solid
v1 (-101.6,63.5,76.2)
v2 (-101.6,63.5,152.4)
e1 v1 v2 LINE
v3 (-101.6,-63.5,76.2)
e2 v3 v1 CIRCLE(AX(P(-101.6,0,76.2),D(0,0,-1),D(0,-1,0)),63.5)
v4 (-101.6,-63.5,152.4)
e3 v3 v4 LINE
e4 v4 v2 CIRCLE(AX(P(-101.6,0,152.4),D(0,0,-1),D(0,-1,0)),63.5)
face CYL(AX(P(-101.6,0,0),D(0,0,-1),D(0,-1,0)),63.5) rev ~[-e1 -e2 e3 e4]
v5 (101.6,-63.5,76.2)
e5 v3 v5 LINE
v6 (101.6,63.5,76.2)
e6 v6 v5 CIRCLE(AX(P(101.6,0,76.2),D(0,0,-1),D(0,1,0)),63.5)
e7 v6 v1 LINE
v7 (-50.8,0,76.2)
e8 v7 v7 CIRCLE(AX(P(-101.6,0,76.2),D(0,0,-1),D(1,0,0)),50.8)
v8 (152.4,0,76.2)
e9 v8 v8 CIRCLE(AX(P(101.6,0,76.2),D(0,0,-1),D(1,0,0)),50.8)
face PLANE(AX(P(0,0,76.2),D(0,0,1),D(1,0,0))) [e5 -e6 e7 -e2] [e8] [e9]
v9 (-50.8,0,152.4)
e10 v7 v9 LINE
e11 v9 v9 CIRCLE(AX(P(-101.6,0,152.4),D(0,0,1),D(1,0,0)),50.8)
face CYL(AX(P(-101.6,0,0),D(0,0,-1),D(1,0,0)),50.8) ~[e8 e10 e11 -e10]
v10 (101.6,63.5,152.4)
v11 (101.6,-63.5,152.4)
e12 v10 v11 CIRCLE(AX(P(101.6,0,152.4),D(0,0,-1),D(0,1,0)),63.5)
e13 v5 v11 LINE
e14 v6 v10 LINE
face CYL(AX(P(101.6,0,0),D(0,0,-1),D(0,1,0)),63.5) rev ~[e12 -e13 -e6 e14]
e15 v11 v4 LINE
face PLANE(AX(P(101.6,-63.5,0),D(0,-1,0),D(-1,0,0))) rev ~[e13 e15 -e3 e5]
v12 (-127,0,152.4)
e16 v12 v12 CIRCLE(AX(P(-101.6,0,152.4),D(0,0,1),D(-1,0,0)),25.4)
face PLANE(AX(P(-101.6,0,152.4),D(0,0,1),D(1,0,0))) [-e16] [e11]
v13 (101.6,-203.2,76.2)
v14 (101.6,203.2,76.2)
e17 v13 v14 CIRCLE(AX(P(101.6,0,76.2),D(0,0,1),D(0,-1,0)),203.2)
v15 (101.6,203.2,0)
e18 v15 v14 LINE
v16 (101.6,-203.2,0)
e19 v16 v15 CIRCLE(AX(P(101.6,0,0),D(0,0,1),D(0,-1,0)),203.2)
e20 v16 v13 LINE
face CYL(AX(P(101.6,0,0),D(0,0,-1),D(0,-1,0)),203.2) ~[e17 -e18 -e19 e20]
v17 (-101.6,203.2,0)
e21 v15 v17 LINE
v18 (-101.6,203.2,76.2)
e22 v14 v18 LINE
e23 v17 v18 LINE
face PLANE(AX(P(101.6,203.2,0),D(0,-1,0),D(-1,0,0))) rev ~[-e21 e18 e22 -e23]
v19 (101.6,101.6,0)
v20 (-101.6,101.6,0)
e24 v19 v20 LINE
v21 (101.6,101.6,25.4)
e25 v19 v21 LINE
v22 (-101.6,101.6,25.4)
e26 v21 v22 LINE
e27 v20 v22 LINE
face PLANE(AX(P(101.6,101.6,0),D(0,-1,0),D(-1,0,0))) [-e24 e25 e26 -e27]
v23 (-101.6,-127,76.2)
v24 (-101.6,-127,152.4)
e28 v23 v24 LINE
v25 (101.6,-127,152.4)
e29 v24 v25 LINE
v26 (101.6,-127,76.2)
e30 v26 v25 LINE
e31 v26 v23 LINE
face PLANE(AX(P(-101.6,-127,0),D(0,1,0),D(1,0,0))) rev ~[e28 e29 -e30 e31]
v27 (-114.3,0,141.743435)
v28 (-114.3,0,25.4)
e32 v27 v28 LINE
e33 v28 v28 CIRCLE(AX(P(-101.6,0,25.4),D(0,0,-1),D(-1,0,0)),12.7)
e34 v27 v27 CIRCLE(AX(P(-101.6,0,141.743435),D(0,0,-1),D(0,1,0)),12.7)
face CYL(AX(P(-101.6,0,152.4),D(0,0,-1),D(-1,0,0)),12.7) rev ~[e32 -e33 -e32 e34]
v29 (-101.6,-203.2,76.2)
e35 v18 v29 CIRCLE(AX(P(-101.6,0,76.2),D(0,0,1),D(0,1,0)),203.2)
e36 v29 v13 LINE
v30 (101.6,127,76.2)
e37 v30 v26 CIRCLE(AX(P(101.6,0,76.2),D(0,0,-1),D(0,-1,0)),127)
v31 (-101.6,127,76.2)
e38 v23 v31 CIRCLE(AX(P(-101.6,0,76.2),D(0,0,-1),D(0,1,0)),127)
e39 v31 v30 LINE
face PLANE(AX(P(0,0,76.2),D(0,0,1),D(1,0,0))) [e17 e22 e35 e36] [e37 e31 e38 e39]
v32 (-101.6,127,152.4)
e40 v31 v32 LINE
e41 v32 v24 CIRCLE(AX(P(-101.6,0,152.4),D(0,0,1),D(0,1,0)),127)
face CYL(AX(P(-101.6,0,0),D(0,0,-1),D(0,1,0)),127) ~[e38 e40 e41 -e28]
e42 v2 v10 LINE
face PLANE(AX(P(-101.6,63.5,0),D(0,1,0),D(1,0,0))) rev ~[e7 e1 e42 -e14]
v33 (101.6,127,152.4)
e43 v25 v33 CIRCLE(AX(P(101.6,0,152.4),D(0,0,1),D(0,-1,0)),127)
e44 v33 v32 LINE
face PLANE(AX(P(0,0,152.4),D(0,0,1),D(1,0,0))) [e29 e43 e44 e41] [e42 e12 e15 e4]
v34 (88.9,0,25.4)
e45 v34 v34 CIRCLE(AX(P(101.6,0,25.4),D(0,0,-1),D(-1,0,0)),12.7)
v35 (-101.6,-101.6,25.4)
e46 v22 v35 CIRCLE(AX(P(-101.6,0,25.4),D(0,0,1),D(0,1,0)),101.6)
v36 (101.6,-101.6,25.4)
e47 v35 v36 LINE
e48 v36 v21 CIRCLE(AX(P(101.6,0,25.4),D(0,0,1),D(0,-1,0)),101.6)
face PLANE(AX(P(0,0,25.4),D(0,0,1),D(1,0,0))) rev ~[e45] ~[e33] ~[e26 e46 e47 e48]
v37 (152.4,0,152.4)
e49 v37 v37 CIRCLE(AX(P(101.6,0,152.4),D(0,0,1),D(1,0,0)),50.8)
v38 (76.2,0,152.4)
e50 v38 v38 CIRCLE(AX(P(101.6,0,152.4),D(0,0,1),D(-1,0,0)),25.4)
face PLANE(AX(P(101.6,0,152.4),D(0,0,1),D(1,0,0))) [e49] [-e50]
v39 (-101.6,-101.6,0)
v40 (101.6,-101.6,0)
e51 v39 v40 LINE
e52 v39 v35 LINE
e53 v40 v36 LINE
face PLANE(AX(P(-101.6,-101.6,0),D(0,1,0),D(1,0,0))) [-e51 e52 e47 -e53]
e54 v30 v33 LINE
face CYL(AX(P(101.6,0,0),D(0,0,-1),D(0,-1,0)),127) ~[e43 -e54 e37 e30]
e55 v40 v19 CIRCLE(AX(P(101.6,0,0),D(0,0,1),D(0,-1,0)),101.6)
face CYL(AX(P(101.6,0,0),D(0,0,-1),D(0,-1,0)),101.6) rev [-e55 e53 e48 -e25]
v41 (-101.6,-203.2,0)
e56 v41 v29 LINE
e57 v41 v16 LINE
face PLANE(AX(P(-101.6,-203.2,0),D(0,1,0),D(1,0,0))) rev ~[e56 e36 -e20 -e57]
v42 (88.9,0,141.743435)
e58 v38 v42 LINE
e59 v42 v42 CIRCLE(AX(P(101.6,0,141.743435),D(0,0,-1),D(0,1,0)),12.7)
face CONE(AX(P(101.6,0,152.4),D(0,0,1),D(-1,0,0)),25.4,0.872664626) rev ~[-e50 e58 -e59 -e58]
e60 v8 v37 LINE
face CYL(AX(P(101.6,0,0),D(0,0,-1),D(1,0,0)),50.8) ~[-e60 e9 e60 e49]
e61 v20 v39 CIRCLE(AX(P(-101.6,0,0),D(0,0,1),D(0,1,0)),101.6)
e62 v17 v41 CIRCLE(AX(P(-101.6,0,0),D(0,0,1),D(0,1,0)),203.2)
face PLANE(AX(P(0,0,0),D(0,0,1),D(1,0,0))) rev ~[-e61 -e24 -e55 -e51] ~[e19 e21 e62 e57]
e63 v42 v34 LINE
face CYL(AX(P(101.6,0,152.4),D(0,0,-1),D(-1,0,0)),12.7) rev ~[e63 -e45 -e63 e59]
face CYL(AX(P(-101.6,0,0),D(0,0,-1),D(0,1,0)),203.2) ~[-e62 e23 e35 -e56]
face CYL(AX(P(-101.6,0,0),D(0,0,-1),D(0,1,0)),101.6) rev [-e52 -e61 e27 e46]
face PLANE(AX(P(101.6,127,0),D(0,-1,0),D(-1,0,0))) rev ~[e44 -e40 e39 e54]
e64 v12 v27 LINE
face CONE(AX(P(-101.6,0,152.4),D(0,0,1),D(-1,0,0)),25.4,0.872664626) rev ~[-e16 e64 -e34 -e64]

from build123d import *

# Parameters (mm, degrees)
F0_R           = 50.8
F0_R_2         = 25.4
F1_DEPTH       = 76.2
F2_DEPTH       = 152.4
F4_DEPTH       = 25.4
F6_D           = 25.4
F6_CSINK_D     = 50.8
F6_CSINK_ANGLE = 100


# Not quite as in the source:
# - a feature names something its author has since deleted; it is built from what else it names


with BuildPart() as f1:
    # F0 (on Top) → F1 (new body)
    with BuildSketch(Plane.XY):
        with BuildLine():
            Line((101.6, 203.2), (-101.6, 203.2))
            ThreePointArc((-101.6, 203.2), (-304.8, 0), (-101.6, -203.2))
            Line((-101.6, -203.2), (101.6, -203.2))
            ThreePointArc((101.6, -203.2), (304.8, 0), (101.6, 203.2))
        make_face()
        with BuildLine():
            ThreePointArc((-101.6, -127), (-228.6, 0), (-101.6, 127))
            Line((-101.6, 127), (101.6, 127))
            ThreePointArc((101.6, 127), (228.6, 0), (101.6, -127))
            Line((101.6, -127), (-101.6, -127))
        make_face(mode=Mode.SUBTRACT)
        with BuildLine():
            Line((101.6, 127), (-101.6, 127))
            ThreePointArc((-101.6, 127), (-228.6, 0), (-101.6, -127))
            Line((-101.6, -127), (101.6, -127))
            ThreePointArc((101.6, -127), (228.6, 0), (101.6, 127))
        make_face()
        with BuildLine():
            ThreePointArc((101.6, 63.5), (165.1, 0), (101.6, -63.5))
            Line((101.6, -63.5), (-101.6, -63.5))
            ThreePointArc((-101.6, -63.5), (-165.1, 0), (-101.6, 63.5))
            Line((-101.6, 63.5), (101.6, 63.5))
        make_face(mode=Mode.SUBTRACT)
        with BuildLine():
            Line((-101.6, -63.5), (101.6, -63.5))
            ThreePointArc((101.6, -63.5), (165.1, 0), (101.6, 63.5))
            Line((101.6, 63.5), (-101.6, 63.5))
            ThreePointArc((-101.6, 63.5), (-165.1, 0), (-101.6, -63.5))
        make_face()
        with Locations((-101.6, 0)):
            Circle(F0_R, mode=Mode.SUBTRACT)
        with Locations((101.6, 0)):
            Circle(F0_R, mode=Mode.SUBTRACT)
        with Locations((-101.6, 0)):
            Circle(F0_R)
        with Locations((-101.6, 0)):
            Circle(F0_R_2, mode=Mode.SUBTRACT)
        with Locations((101.6, 0)):
            Circle(F0_R)
        with Locations((101.6, 0)):
            Circle(F0_R_2, mode=Mode.SUBTRACT)
        with Locations((-101.6, 0)):
            Circle(F0_R_2)
        with Locations((101.6, 0)):
            Circle(F0_R_2)
    extrude(amount=F1_DEPTH)

    # F0 (on Top) → F2 (join)
    with BuildSketch(Plane.XY):
        with BuildLine():
            Line((101.6, 127), (-101.6, 127))
            ThreePointArc((-101.6, 127), (-228.6, 0), (-101.6, -127))
            Line((-101.6, -127), (101.6, -127))
            ThreePointArc((101.6, -127), (228.6, 0), (101.6, 127))
        make_face()
        with BuildLine():
            ThreePointArc((101.6, 63.5), (165.1, 0), (101.6, -63.5))
            Line((101.6, -63.5), (-101.6, -63.5))
            ThreePointArc((-101.6, -63.5), (-165.1, 0), (-101.6, 63.5))
            Line((-101.6, 63.5), (101.6, 63.5))
        make_face(mode=Mode.SUBTRACT)
        with Locations((101.6, 0)):
            Circle(F0_R)
        with Locations((101.6, 0)):
            Circle(F0_R_2, mode=Mode.SUBTRACT)
        with Locations((-101.6, 0)):
            Circle(F0_R)
        with Locations((-101.6, 0)):
            Circle(F0_R_2, mode=Mode.SUBTRACT)
        with Locations((101.6, 0)):
            Circle(F0_R_2)
        with Locations((-101.6, 0)):
            Circle(F0_R_2)
    extrude(amount=F2_DEPTH)

    # F3 (on face) → F4 (cut)
    with BuildSketch(Plane.XY):
        with BuildLine():
            Line((101.6, 101.6), (-101.6, 101.6))
            ThreePointArc((-101.6, 101.6), (-203.2, 0), (-101.6, -101.6))
            Line((-101.6, -101.6), (101.6, -101.6))
            ThreePointArc((101.6, -101.6), (203.2, 0), (101.6, 101.6))
        make_face()
    extrude(amount=F4_DEPTH, mode=Mode.SUBTRACT)

    # F6 (through all)
    with Locations(Plane.XY.offset(152.4)):
        with Locations((-101.6, 0), (101.6, 0)):
            CounterSinkHole(F6_D / 2, F6_CSINK_D / 2, counter_sink_angle=F6_CSINK_ANGLE)


solid = f1.part
